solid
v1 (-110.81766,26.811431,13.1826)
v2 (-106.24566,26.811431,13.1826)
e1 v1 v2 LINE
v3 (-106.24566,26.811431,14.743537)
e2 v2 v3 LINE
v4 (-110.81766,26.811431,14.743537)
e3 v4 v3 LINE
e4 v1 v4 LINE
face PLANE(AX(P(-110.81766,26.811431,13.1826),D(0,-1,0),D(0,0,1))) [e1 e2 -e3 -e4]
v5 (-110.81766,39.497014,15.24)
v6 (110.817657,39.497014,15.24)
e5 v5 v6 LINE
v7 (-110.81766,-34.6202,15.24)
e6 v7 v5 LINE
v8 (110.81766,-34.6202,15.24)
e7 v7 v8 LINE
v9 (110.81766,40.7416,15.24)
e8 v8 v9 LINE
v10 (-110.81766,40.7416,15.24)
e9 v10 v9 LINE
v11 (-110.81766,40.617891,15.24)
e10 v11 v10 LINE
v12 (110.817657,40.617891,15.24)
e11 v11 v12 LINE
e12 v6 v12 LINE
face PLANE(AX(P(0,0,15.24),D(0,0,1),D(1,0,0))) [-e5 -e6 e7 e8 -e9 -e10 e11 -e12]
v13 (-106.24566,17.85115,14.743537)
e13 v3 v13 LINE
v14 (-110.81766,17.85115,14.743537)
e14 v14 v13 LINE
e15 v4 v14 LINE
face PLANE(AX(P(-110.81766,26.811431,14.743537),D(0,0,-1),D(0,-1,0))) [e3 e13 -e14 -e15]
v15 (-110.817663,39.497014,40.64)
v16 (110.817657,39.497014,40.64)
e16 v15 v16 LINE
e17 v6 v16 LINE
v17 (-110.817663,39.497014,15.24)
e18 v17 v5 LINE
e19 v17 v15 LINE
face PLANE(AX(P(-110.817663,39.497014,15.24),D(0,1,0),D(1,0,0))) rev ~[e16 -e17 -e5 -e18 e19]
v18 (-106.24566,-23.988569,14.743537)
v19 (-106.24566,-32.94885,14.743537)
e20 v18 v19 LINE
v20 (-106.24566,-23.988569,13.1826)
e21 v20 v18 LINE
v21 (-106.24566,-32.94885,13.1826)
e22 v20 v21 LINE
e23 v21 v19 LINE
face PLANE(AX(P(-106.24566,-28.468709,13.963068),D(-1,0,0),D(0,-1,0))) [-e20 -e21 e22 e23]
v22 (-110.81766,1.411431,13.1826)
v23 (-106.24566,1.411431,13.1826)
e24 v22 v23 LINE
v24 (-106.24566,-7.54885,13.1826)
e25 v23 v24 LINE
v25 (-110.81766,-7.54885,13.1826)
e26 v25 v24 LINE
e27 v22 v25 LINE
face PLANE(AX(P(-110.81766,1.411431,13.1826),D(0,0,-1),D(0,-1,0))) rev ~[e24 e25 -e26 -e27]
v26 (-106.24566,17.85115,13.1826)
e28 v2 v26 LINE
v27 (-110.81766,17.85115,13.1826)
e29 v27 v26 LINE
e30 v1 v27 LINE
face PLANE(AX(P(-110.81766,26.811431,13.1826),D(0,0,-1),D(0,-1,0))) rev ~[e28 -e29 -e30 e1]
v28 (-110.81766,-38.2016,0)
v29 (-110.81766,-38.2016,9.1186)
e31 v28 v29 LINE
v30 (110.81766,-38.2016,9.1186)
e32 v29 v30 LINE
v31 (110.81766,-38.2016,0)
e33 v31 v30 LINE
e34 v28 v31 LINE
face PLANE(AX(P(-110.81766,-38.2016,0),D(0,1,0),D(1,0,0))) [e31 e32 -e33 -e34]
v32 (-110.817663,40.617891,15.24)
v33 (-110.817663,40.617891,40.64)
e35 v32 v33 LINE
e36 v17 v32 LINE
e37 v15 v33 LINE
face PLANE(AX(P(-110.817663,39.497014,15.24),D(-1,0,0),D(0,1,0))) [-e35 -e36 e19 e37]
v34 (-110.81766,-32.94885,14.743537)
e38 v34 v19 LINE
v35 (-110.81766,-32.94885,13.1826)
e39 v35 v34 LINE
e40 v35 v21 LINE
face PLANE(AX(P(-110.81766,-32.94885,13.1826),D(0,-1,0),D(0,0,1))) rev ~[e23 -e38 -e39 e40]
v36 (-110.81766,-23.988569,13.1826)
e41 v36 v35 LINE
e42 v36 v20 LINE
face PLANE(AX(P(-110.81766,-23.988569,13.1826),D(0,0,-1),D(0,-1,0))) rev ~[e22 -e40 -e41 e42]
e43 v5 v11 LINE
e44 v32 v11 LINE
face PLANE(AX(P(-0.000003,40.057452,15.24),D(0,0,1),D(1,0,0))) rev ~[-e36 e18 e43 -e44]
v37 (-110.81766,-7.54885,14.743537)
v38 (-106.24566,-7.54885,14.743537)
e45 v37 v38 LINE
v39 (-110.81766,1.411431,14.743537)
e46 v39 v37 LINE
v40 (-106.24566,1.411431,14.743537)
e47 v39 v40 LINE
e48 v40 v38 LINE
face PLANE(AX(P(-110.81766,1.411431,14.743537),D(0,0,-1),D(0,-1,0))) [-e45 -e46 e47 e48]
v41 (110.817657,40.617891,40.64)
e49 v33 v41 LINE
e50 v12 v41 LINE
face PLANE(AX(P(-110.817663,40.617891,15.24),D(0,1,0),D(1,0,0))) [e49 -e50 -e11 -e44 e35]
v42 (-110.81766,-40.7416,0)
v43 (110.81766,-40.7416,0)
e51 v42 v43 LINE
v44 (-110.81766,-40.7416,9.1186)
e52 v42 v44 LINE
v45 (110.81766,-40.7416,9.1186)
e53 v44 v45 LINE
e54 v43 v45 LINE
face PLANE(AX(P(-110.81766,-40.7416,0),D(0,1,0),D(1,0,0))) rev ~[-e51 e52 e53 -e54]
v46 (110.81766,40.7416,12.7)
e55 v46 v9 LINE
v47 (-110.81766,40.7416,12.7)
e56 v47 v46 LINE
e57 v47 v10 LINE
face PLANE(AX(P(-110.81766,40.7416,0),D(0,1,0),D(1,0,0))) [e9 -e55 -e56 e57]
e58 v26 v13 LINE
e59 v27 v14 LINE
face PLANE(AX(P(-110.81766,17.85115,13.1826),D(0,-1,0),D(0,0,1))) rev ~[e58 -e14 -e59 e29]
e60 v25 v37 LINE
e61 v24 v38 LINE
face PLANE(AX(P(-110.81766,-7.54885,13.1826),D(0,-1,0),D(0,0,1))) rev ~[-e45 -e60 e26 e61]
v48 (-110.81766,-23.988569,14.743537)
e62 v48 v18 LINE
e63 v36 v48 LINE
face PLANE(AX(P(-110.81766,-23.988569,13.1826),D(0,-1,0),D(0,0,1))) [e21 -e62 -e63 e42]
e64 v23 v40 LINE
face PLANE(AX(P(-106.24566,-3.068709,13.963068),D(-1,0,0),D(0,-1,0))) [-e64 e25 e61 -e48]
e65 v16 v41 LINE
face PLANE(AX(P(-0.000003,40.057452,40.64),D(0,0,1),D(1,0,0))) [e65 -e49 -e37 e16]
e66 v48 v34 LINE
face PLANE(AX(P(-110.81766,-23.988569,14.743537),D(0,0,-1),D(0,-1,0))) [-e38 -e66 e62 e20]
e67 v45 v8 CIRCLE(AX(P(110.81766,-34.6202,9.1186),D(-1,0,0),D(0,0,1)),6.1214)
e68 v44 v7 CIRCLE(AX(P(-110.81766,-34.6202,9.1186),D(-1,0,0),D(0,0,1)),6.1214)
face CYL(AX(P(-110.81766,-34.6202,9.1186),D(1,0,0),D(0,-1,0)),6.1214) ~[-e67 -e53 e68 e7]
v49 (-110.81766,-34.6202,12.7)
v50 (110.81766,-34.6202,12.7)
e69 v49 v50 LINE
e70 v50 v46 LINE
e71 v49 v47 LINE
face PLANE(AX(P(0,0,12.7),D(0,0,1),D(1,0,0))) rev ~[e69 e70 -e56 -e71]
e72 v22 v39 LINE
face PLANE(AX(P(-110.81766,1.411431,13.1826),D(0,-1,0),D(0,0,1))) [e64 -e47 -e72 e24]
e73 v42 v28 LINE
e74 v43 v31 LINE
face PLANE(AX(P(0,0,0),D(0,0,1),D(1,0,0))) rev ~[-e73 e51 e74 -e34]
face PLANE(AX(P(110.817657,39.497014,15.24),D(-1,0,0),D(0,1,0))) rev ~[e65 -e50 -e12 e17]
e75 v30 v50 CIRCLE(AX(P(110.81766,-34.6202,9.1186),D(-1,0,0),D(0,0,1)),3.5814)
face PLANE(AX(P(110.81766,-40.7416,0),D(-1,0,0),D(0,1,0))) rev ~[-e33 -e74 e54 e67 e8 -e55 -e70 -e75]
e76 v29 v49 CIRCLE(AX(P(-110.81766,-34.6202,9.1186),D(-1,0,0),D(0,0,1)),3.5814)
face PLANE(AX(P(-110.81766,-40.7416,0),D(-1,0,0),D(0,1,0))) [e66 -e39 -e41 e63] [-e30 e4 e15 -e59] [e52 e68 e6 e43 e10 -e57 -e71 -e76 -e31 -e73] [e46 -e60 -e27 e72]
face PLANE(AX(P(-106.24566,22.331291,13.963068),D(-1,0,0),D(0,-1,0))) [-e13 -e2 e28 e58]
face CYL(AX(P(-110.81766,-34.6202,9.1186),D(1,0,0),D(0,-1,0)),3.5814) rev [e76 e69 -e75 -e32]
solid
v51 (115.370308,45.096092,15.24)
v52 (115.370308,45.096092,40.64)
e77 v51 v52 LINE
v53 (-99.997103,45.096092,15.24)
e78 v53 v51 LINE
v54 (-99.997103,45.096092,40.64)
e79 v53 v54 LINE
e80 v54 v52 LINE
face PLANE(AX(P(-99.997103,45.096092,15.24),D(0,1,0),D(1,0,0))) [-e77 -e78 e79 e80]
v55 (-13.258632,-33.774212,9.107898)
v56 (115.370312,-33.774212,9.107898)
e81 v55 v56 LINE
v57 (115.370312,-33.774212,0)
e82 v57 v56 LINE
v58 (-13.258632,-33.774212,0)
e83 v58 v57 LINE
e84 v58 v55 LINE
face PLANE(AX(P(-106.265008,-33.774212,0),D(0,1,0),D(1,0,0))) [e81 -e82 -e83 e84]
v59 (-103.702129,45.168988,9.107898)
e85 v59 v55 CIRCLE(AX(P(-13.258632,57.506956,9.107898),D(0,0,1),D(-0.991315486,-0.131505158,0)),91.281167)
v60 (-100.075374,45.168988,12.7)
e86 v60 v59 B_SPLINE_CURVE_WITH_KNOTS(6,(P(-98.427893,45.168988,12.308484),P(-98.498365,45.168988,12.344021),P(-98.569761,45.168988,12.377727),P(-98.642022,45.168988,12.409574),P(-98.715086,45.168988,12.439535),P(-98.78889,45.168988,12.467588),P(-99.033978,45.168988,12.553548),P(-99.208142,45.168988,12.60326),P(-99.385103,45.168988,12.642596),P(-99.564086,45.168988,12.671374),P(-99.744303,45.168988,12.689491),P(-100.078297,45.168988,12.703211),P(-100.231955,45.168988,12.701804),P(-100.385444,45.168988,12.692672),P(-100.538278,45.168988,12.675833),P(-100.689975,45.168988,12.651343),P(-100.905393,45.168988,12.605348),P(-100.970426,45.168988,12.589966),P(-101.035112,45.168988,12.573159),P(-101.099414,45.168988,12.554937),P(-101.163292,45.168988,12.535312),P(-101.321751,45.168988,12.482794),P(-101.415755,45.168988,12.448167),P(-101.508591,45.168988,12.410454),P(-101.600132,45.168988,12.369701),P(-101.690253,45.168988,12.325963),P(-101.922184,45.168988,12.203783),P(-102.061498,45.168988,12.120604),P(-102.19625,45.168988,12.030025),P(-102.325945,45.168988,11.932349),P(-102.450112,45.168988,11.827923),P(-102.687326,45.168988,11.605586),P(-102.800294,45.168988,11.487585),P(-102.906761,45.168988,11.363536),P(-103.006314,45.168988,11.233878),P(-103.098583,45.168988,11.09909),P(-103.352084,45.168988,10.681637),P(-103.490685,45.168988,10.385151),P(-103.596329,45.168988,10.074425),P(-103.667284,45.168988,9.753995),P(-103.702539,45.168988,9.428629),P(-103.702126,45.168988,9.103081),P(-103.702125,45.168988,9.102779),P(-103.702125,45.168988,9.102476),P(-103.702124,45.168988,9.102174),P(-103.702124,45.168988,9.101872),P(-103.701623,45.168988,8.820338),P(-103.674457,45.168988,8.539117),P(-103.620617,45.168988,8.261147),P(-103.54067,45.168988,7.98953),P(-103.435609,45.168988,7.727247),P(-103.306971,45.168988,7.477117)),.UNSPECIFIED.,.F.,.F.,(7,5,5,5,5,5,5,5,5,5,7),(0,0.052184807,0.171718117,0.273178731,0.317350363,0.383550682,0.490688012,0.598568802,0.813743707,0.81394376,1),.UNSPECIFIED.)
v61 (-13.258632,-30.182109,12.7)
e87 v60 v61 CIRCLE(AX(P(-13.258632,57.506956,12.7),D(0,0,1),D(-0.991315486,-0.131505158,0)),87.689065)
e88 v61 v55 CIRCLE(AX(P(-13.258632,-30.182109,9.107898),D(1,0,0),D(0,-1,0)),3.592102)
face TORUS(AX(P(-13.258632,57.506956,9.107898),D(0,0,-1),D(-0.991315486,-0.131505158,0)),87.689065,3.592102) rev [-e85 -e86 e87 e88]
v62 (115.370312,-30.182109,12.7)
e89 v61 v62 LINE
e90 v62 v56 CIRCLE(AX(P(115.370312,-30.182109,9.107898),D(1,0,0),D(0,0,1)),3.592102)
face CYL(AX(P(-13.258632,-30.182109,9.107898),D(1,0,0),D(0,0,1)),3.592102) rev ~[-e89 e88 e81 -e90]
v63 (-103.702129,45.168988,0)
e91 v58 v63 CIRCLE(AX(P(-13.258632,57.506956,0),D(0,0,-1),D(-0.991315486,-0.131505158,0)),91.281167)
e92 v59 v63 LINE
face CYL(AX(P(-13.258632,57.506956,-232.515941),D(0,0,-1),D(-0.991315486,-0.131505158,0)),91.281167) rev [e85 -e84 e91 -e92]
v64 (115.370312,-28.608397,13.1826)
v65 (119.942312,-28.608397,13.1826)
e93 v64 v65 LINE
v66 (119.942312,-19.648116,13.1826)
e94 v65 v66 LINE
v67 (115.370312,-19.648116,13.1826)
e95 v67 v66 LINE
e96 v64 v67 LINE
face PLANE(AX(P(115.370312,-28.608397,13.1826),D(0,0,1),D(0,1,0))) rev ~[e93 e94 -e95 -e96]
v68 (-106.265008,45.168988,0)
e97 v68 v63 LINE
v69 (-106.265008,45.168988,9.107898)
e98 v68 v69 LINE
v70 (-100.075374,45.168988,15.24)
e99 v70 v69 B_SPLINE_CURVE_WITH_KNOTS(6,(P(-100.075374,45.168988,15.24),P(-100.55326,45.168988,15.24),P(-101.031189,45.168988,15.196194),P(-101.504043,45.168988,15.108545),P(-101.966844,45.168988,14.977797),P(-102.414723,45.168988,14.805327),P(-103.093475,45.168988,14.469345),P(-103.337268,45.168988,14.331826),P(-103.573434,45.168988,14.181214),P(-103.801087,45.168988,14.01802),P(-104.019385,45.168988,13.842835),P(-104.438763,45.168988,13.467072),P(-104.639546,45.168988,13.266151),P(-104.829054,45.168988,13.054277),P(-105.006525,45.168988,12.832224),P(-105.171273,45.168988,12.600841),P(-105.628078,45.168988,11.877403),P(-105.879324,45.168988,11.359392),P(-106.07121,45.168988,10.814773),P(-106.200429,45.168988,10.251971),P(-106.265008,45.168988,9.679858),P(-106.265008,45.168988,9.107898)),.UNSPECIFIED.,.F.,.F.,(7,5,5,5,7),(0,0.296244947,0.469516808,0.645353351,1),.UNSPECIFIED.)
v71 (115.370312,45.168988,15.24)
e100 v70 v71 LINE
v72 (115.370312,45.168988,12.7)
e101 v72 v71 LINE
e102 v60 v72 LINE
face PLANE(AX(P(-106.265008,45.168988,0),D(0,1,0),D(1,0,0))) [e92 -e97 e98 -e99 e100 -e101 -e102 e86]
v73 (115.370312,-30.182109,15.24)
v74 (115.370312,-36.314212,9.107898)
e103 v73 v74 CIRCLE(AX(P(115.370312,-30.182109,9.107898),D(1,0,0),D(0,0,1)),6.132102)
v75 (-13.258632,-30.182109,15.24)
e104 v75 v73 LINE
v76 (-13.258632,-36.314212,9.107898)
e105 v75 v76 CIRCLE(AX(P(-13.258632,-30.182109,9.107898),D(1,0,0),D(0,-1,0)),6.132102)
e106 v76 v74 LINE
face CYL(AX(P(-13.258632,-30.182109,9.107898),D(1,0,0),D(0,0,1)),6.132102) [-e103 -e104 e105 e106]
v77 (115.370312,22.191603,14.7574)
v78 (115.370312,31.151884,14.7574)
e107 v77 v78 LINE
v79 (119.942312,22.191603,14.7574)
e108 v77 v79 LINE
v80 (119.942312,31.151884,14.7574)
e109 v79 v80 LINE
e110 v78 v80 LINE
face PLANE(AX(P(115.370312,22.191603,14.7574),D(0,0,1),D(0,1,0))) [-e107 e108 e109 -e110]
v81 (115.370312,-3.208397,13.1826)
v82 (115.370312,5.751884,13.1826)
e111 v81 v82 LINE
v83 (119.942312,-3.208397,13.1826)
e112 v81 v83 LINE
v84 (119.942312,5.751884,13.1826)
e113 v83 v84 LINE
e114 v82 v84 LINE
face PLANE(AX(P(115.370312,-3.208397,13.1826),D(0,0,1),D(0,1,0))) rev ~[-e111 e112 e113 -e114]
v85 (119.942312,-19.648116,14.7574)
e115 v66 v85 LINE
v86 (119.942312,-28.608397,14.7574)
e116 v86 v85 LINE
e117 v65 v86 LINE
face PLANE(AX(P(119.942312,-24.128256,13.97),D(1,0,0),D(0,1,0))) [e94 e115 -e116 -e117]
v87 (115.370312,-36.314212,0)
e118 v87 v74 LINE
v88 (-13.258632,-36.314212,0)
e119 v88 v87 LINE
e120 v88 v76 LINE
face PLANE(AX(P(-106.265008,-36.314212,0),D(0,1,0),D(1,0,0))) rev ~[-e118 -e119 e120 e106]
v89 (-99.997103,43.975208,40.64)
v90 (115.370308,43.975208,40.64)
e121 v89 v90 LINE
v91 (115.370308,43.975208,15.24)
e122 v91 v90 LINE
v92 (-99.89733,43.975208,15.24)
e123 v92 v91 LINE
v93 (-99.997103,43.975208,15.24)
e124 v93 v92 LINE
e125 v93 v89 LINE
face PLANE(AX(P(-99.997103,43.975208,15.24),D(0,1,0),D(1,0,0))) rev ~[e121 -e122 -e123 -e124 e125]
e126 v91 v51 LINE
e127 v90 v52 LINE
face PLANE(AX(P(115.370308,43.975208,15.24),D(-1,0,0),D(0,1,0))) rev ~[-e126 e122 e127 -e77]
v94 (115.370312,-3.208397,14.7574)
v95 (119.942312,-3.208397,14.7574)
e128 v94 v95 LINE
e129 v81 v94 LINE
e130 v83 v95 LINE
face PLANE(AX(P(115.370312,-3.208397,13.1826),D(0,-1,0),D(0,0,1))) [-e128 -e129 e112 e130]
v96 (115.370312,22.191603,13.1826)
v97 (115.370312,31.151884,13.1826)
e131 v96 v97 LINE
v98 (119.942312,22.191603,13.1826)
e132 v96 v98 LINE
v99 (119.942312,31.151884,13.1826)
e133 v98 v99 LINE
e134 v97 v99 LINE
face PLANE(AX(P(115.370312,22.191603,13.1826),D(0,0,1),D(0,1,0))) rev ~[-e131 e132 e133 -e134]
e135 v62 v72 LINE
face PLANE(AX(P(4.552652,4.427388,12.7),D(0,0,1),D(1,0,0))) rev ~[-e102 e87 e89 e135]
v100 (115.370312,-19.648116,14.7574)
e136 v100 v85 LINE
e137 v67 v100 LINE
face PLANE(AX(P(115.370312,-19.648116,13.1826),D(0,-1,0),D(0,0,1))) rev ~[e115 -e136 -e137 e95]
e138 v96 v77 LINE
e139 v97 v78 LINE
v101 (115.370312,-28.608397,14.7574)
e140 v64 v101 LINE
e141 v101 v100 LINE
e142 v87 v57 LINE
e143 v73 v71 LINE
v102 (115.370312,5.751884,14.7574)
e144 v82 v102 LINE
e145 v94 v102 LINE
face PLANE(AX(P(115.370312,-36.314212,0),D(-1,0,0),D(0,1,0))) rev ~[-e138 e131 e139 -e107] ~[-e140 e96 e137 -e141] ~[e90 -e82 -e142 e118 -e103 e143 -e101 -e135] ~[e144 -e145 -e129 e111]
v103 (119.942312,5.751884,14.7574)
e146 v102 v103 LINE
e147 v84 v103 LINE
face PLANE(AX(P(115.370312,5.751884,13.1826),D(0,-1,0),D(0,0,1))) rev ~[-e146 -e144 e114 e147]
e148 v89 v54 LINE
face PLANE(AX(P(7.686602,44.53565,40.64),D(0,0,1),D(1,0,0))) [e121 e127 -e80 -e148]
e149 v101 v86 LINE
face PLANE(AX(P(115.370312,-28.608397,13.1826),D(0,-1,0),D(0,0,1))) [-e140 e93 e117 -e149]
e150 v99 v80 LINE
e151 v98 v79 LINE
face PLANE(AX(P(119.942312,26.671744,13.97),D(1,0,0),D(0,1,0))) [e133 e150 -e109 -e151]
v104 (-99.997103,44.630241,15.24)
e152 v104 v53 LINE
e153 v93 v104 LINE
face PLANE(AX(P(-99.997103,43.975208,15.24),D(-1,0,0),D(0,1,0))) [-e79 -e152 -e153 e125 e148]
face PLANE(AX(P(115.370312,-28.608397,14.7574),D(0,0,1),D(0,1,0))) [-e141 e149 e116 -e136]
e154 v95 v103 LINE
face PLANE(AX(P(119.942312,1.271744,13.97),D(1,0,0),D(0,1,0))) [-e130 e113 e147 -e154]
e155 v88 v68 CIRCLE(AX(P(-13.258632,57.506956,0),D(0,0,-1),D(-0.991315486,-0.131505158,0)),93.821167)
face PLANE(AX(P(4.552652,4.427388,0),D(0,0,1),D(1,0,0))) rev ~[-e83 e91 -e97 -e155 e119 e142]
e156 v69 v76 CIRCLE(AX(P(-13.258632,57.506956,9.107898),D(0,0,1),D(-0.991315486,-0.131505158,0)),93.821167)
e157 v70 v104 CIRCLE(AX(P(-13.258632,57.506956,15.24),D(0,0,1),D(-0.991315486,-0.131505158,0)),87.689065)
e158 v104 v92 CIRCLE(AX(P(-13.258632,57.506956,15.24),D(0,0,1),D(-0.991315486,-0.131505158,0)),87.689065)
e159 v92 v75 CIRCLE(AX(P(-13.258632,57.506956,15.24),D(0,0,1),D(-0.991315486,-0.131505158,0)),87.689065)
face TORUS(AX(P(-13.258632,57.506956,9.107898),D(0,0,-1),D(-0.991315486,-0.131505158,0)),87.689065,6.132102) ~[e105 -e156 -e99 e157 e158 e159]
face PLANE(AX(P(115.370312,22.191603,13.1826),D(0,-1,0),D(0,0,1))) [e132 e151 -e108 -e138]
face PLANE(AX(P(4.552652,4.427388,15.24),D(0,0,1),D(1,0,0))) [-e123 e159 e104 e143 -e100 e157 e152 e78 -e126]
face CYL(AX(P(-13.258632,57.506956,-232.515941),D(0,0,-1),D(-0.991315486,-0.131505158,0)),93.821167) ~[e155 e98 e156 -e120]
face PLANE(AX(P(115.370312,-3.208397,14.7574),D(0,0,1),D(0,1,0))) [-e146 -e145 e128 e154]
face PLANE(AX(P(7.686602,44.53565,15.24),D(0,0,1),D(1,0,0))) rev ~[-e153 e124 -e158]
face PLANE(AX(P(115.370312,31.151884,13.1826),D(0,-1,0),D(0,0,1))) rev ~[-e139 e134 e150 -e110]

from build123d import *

# Parameters (mm, degrees)
F0_W        = 221.63532
F0_H        = 81.4832
F1_DEPTH    = 15.24
F2_T1_DEPTH = 480.2718812368
F3_R        = 6.1321024484
F4_T        = -2.54
F5_W        = 8.9602805674
F5_H        = 1.5747996354
F5_W_2      = 8.960280932
F5_H_2      = 1.5748
F6_DEPTH    = 4.572
F7_W        = 221.63532
F7_H        = 81.4832
F8_DEPTH    = 15.24
F9_R        = 6.1214
F10_T       = -2.54
F11_W       = 8.9602805674
F11_H       = 1.5609367454
F11_W_2     = 8.960280932
F11_H_2     = 1.56093711
F12_DEPTH   = 4.572
F13_W       = 215.3674113799
F13_H       = 1.1208840015
F14_DEPTH   = 25.4
F15_W       = 221.63532
F15_H       = 1.1208766
F16_DEPTH   = 25.4


# Not quite as in the source:
# - a fillet or chamfer that OpenCascade refuses, or shapes differently, is made with other operations: its cross-section is extruded or revolved along the edge and cut away or added


with BuildPart() as f1:
    # F0 (on Top) → F1 (new body)
    with BuildSketch(Plane.XY):
        with Locations((4.5526515504, 4.4273882142)):
            Rectangle(F0_W, F0_H)
    extrude(amount=F1_DEPTH)

    # F2: fillet of radius 93.8211674609 on 1 edges, made by hand

    # F2_s2 → F2_t1 (cut)
    with BuildSketch(Plane.XY.offset(-232.5159406184)):
        with BuildLine():
            ThreePointArc((-106.2650084496, 45.1689882142), (-75.0843912046, -13.0620671855), (-13.2586322022, -36.3142117858))
            Line((-13.2586322022, -36.3142117858), (-106.2650084496, -36.3142117858))
            Line((-106.2650084496, -36.3142117858), (-106.2650084496, 45.1689882142))
        make_face()
    extrude(amount=F2_T1_DEPTH, mode=Mode.SUBTRACT)

    # F3
    f3_edges = [f1.edges().sort_by_distance(p)[0] for p in [
        (51.05584, -36.314212, 15.24),
    ]]
    fillet(f3_edges, radius=F3_R)

    # F4
    f4_openings = [f1.faces().sort_by_distance(p)[0] for p in [
        (14.62211, 6.737734, 0),
        (4.817098, 45.168988, 7.604896),
        (115.370312, 4.684912, 7.579118),
    ]]
    offset(amount=F4_T, openings=f4_openings)

    # F5 (on face) → F6 (join)
    with BuildSketch(Plane.YZ.offset(115.3703115504)):
        with Locations((-24.1282563657, 13.97)):
            Rectangle(F5_W, F5_H)
        with Locations((1.2717436343, 13.97)):
            Rectangle(F5_W_2, F5_H_2)
        with Locations((26.6717436343, 13.97)):
            Rectangle(F5_W_2, F5_H_2)
    extrude(amount=F6_DEPTH)

    # F13 (on face) → F14 (join)
    with BuildSketch(Plane.XY.offset(15.24)):
        with Locations((7.6866024757, 44.5356499554)):
            Rectangle(F13_W, F13_H)
    extrude(amount=F14_DEPTH)


with BuildPart() as f8:
    # F7 (on Top) → F8 (new body)
    with BuildSketch(Plane.XY):
        Rectangle(F7_W, F7_H)
    extrude(amount=F8_DEPTH)

    # F9
    f9_edges = [f8.edges().sort_by_distance(p)[0] for p in [
        (0, -40.7416, 15.24),
    ]]
    fillet(f9_edges, radius=F9_R)

    # F10
    f10_openings = [f8.faces().sort_by_distance(p)[0] for p in [
        (0, 0, 0),
        (-110.81766, 0.256635, 7.579246),
        (110.81766, 0.256635, 7.579246),
        (0, 40.7416, 7.62),
    ]]
    offset(amount=F10_T, openings=f10_openings)

    # F11 (on face) → F12 (cut)
    with BuildSketch(Plane(origin=(-110.81766, 0, 0), x_dir=(0, -1, 0), z_dir=(-1, 0, 0))):
        with Locations((-22.3312906812, 13.9630684015)):
            Rectangle(F11_W, F11_H)
        with Locations((3.0687093188, 13.9630684015)):
            Rectangle(F11_W_2, F11_H_2)
        with Locations((28.4687093188, 13.9630684015)):
            Rectangle(F11_W_2, F11_H_2)
    extrude(amount=-F12_DEPTH, mode=Mode.SUBTRACT)

    # F15 (on face) → F16 (join)
    with BuildSketch(Plane.XY.offset(15.24)):
        with Locations((-3.3716e-06, 40.0574524351)):
            Rectangle(F15_W, F15_H)
    extrude(amount=F16_DEPTH)


solid = Compound([f1.part, f8.part])
